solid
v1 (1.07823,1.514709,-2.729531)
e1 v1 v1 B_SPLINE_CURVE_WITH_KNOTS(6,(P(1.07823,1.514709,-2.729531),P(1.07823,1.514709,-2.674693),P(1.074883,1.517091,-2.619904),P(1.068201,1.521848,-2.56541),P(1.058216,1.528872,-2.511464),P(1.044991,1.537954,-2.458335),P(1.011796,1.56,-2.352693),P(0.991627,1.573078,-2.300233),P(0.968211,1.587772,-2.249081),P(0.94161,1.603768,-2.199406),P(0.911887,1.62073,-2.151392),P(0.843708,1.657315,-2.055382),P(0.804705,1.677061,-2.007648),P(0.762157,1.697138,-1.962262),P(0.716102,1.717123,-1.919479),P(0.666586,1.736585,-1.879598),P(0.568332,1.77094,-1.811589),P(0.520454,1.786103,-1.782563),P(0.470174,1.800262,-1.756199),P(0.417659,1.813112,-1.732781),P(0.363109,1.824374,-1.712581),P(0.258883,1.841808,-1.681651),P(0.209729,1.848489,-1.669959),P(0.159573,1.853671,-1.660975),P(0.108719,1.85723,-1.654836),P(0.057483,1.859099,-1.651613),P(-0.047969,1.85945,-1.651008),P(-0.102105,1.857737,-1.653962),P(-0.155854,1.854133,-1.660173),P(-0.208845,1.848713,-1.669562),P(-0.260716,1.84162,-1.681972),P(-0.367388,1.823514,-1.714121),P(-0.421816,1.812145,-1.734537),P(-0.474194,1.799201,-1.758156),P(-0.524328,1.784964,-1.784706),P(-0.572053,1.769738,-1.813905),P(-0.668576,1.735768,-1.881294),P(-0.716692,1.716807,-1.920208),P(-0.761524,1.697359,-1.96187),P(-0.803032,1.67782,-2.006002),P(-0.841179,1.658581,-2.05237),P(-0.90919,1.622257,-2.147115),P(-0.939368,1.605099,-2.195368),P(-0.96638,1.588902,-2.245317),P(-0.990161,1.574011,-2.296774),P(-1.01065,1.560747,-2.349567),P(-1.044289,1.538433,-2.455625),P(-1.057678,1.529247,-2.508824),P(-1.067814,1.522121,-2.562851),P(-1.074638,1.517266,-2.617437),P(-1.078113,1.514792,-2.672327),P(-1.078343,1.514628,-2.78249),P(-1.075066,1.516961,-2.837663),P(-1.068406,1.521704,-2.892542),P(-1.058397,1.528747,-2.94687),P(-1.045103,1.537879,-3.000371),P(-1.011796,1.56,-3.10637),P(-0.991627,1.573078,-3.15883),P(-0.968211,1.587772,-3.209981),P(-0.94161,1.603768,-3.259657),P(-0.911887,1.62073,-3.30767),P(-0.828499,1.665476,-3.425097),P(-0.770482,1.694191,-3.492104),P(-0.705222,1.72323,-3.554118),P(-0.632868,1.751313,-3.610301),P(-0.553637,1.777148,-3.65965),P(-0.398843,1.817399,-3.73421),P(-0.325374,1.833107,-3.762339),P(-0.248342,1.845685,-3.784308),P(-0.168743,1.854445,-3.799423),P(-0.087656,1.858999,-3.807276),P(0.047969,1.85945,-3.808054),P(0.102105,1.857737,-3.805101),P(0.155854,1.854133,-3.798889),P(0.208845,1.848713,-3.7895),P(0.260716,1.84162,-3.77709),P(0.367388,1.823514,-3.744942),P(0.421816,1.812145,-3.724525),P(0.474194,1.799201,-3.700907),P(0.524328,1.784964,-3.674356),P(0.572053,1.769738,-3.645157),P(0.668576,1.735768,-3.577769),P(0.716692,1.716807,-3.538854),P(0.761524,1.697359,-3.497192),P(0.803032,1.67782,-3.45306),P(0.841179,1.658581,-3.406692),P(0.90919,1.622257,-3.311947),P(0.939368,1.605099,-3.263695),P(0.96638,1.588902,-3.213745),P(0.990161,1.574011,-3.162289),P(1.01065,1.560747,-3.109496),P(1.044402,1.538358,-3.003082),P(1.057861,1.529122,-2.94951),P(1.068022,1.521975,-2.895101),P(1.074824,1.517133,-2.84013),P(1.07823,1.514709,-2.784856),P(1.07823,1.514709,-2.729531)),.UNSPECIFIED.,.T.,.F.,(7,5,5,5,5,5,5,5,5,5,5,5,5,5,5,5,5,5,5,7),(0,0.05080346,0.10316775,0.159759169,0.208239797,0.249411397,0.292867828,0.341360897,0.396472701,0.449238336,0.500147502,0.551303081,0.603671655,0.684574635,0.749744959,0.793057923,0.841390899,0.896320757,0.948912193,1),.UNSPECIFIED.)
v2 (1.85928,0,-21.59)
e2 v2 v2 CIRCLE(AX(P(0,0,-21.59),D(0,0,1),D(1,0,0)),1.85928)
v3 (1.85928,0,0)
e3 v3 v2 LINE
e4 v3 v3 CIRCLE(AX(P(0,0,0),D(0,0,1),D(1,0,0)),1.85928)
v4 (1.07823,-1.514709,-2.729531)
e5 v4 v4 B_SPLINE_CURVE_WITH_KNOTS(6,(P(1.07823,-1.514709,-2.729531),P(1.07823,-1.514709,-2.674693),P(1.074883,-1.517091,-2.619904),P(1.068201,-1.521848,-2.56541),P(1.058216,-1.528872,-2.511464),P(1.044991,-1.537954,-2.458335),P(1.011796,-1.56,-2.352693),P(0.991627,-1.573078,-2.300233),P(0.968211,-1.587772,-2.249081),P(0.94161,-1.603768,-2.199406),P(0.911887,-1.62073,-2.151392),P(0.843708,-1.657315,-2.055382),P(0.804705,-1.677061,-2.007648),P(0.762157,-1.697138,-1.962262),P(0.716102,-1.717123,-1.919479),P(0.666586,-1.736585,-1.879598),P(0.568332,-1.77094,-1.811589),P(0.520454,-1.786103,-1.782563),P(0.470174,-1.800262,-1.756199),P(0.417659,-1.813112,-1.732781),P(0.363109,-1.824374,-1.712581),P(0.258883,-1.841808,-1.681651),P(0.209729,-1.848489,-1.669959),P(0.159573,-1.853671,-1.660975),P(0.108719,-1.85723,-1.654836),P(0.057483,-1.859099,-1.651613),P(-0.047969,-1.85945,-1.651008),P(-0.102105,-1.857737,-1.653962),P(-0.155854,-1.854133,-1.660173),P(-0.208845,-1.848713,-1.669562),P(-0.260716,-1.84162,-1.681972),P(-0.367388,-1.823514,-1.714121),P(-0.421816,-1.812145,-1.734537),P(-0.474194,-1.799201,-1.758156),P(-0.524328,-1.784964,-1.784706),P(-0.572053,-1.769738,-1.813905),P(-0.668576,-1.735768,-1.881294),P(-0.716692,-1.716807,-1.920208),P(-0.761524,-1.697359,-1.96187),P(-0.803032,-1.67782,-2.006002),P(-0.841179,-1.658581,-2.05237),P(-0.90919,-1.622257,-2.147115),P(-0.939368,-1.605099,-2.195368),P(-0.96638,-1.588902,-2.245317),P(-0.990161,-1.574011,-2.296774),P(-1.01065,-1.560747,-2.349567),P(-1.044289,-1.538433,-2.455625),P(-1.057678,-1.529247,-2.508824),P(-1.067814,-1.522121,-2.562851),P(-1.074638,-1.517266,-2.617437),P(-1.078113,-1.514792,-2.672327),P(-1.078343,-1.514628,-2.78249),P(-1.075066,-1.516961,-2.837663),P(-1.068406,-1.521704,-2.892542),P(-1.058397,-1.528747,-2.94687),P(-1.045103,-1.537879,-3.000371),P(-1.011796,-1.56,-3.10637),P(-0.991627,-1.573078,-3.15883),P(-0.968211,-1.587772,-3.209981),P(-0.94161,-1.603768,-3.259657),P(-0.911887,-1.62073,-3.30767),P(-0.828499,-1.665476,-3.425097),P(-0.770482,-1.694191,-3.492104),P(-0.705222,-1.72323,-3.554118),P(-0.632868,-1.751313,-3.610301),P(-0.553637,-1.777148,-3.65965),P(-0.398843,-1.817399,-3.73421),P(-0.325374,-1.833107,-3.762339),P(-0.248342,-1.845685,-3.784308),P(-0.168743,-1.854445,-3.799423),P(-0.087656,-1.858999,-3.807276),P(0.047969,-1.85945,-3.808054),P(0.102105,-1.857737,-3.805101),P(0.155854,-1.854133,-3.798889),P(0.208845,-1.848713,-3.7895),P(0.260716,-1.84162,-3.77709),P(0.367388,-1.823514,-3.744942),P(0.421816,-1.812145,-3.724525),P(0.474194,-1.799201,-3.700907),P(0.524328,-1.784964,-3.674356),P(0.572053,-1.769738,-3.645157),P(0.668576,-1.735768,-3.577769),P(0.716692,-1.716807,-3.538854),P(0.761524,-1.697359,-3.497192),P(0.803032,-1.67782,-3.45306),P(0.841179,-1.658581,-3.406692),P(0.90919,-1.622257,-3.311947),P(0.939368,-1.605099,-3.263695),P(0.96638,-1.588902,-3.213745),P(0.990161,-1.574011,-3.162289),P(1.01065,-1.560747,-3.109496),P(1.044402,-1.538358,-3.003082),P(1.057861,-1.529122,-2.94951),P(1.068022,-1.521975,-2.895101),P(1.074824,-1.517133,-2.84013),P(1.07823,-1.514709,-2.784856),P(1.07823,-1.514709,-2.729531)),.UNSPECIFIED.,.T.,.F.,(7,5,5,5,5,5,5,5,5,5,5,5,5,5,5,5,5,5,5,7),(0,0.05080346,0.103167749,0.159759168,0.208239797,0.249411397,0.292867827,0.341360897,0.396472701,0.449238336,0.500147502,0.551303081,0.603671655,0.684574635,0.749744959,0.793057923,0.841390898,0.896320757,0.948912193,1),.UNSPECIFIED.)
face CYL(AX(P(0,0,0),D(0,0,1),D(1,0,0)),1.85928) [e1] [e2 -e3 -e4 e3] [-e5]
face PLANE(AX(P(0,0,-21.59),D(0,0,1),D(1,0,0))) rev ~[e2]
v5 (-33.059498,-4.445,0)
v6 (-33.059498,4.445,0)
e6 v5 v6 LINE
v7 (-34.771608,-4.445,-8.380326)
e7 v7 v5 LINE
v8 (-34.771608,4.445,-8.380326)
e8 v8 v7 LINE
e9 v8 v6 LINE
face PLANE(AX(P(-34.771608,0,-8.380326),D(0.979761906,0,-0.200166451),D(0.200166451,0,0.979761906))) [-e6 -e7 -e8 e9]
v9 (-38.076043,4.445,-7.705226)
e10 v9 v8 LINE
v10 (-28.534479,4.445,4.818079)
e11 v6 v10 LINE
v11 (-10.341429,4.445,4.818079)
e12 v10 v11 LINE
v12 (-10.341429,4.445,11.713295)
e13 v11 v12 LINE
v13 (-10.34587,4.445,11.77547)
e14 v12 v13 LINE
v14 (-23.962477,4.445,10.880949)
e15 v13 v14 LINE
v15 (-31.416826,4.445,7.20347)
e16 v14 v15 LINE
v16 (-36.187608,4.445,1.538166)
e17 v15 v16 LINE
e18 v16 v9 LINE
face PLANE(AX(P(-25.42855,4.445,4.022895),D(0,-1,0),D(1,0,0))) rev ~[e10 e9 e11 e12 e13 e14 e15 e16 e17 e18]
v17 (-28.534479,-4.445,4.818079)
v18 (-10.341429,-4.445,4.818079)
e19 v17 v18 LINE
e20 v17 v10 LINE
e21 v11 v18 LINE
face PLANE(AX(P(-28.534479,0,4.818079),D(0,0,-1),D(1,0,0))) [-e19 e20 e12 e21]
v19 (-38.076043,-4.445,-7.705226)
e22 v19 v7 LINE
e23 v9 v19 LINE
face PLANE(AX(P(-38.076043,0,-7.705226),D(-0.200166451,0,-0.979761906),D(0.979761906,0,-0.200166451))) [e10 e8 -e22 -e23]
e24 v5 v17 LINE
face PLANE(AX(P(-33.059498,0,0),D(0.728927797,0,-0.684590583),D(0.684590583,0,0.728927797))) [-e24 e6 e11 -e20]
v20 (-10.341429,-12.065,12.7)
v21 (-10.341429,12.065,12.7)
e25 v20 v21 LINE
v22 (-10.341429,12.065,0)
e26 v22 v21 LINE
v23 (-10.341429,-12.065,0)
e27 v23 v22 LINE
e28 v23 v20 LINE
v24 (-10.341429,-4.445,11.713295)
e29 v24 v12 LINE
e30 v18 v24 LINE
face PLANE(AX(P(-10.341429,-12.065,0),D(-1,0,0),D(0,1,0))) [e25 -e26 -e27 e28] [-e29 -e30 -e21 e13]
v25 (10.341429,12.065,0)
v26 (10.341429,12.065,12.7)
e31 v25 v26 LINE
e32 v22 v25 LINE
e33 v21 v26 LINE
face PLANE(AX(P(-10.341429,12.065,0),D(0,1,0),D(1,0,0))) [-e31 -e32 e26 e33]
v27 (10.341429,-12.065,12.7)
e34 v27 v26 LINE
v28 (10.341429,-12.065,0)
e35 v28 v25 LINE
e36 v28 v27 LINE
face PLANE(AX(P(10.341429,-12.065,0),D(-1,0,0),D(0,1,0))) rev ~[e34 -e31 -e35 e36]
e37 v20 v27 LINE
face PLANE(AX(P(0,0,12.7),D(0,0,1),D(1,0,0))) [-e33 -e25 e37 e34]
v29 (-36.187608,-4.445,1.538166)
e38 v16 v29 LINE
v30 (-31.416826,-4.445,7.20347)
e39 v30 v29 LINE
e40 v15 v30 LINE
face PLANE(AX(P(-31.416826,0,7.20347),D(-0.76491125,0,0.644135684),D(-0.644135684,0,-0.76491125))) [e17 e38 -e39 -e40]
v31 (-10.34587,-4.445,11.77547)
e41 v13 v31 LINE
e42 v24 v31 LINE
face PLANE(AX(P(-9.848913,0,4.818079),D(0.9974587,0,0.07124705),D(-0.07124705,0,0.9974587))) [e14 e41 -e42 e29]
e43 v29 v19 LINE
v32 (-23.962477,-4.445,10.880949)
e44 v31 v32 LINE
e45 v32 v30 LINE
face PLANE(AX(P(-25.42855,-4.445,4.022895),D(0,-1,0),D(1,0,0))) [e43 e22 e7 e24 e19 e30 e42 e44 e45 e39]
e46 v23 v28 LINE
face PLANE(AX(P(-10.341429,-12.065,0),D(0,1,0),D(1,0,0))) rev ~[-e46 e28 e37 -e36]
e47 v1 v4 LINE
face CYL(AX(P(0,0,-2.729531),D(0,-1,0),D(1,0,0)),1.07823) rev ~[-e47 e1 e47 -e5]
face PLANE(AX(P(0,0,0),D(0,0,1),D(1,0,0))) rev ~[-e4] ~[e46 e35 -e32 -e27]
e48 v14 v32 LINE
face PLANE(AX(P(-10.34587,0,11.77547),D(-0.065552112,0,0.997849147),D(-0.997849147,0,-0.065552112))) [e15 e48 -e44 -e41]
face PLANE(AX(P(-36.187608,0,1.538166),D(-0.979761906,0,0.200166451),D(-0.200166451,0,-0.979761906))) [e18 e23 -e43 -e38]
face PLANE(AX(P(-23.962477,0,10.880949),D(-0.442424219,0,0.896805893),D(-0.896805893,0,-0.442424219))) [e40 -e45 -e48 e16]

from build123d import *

# Parameters (mm, degrees)
F0_R     = 1.85928
F1_DEPTH = 21.59
F2_R     = 1.07823
F3_DEPTH = 3.175
F4_W     = 20.6828571429
F4_H     = 24.13
F5_DEPTH = 12.7
F7_DEPTH = 4.445


# Not quite as in the source:
# - a feature names something its author has since deleted; it is built from what else it names


with BuildPart() as f1:
    # F0 (on Top) → F1 (new body)
    with BuildSketch(Plane.XY):
        Circle(F0_R)
    extrude(amount=-F1_DEPTH)

    # F2 (on Front) → F3 (cut, symmetric)
    with BuildSketch(Plane.XZ):
        with Locations((0, -2.7295311447)):
            Circle(F2_R)
    extrude(amount=F3_DEPTH, both=True, mode=Mode.SUBTRACT)

    # F4 (on Top) → F5 (join)
    with BuildSketch(Plane.XY):
        Rectangle(F4_W, F4_H)
    extrude(amount=F5_DEPTH)

    # F6 (on Front) → F7 (join, symmetric)
    with BuildSketch(Plane.XZ):
        Polygon((-9.8489131778, 4.8180790618), (-10.3458696976, 11.7754703388), (-23.9624772221, 10.8809489757), (-31.4168259501, 7.2034704499), (-36.187607795, 1.5381660778), (-38.076043129, -7.7052260749), (-34.7716075912, -8.3803259436), (-33.0594976471, 0), (-28.5344794393, 4.8180790618), (-21.7758696526, 4.8180790618), align=None)
    extrude(amount=F7_DEPTH, both=True)


solid = f1.part
